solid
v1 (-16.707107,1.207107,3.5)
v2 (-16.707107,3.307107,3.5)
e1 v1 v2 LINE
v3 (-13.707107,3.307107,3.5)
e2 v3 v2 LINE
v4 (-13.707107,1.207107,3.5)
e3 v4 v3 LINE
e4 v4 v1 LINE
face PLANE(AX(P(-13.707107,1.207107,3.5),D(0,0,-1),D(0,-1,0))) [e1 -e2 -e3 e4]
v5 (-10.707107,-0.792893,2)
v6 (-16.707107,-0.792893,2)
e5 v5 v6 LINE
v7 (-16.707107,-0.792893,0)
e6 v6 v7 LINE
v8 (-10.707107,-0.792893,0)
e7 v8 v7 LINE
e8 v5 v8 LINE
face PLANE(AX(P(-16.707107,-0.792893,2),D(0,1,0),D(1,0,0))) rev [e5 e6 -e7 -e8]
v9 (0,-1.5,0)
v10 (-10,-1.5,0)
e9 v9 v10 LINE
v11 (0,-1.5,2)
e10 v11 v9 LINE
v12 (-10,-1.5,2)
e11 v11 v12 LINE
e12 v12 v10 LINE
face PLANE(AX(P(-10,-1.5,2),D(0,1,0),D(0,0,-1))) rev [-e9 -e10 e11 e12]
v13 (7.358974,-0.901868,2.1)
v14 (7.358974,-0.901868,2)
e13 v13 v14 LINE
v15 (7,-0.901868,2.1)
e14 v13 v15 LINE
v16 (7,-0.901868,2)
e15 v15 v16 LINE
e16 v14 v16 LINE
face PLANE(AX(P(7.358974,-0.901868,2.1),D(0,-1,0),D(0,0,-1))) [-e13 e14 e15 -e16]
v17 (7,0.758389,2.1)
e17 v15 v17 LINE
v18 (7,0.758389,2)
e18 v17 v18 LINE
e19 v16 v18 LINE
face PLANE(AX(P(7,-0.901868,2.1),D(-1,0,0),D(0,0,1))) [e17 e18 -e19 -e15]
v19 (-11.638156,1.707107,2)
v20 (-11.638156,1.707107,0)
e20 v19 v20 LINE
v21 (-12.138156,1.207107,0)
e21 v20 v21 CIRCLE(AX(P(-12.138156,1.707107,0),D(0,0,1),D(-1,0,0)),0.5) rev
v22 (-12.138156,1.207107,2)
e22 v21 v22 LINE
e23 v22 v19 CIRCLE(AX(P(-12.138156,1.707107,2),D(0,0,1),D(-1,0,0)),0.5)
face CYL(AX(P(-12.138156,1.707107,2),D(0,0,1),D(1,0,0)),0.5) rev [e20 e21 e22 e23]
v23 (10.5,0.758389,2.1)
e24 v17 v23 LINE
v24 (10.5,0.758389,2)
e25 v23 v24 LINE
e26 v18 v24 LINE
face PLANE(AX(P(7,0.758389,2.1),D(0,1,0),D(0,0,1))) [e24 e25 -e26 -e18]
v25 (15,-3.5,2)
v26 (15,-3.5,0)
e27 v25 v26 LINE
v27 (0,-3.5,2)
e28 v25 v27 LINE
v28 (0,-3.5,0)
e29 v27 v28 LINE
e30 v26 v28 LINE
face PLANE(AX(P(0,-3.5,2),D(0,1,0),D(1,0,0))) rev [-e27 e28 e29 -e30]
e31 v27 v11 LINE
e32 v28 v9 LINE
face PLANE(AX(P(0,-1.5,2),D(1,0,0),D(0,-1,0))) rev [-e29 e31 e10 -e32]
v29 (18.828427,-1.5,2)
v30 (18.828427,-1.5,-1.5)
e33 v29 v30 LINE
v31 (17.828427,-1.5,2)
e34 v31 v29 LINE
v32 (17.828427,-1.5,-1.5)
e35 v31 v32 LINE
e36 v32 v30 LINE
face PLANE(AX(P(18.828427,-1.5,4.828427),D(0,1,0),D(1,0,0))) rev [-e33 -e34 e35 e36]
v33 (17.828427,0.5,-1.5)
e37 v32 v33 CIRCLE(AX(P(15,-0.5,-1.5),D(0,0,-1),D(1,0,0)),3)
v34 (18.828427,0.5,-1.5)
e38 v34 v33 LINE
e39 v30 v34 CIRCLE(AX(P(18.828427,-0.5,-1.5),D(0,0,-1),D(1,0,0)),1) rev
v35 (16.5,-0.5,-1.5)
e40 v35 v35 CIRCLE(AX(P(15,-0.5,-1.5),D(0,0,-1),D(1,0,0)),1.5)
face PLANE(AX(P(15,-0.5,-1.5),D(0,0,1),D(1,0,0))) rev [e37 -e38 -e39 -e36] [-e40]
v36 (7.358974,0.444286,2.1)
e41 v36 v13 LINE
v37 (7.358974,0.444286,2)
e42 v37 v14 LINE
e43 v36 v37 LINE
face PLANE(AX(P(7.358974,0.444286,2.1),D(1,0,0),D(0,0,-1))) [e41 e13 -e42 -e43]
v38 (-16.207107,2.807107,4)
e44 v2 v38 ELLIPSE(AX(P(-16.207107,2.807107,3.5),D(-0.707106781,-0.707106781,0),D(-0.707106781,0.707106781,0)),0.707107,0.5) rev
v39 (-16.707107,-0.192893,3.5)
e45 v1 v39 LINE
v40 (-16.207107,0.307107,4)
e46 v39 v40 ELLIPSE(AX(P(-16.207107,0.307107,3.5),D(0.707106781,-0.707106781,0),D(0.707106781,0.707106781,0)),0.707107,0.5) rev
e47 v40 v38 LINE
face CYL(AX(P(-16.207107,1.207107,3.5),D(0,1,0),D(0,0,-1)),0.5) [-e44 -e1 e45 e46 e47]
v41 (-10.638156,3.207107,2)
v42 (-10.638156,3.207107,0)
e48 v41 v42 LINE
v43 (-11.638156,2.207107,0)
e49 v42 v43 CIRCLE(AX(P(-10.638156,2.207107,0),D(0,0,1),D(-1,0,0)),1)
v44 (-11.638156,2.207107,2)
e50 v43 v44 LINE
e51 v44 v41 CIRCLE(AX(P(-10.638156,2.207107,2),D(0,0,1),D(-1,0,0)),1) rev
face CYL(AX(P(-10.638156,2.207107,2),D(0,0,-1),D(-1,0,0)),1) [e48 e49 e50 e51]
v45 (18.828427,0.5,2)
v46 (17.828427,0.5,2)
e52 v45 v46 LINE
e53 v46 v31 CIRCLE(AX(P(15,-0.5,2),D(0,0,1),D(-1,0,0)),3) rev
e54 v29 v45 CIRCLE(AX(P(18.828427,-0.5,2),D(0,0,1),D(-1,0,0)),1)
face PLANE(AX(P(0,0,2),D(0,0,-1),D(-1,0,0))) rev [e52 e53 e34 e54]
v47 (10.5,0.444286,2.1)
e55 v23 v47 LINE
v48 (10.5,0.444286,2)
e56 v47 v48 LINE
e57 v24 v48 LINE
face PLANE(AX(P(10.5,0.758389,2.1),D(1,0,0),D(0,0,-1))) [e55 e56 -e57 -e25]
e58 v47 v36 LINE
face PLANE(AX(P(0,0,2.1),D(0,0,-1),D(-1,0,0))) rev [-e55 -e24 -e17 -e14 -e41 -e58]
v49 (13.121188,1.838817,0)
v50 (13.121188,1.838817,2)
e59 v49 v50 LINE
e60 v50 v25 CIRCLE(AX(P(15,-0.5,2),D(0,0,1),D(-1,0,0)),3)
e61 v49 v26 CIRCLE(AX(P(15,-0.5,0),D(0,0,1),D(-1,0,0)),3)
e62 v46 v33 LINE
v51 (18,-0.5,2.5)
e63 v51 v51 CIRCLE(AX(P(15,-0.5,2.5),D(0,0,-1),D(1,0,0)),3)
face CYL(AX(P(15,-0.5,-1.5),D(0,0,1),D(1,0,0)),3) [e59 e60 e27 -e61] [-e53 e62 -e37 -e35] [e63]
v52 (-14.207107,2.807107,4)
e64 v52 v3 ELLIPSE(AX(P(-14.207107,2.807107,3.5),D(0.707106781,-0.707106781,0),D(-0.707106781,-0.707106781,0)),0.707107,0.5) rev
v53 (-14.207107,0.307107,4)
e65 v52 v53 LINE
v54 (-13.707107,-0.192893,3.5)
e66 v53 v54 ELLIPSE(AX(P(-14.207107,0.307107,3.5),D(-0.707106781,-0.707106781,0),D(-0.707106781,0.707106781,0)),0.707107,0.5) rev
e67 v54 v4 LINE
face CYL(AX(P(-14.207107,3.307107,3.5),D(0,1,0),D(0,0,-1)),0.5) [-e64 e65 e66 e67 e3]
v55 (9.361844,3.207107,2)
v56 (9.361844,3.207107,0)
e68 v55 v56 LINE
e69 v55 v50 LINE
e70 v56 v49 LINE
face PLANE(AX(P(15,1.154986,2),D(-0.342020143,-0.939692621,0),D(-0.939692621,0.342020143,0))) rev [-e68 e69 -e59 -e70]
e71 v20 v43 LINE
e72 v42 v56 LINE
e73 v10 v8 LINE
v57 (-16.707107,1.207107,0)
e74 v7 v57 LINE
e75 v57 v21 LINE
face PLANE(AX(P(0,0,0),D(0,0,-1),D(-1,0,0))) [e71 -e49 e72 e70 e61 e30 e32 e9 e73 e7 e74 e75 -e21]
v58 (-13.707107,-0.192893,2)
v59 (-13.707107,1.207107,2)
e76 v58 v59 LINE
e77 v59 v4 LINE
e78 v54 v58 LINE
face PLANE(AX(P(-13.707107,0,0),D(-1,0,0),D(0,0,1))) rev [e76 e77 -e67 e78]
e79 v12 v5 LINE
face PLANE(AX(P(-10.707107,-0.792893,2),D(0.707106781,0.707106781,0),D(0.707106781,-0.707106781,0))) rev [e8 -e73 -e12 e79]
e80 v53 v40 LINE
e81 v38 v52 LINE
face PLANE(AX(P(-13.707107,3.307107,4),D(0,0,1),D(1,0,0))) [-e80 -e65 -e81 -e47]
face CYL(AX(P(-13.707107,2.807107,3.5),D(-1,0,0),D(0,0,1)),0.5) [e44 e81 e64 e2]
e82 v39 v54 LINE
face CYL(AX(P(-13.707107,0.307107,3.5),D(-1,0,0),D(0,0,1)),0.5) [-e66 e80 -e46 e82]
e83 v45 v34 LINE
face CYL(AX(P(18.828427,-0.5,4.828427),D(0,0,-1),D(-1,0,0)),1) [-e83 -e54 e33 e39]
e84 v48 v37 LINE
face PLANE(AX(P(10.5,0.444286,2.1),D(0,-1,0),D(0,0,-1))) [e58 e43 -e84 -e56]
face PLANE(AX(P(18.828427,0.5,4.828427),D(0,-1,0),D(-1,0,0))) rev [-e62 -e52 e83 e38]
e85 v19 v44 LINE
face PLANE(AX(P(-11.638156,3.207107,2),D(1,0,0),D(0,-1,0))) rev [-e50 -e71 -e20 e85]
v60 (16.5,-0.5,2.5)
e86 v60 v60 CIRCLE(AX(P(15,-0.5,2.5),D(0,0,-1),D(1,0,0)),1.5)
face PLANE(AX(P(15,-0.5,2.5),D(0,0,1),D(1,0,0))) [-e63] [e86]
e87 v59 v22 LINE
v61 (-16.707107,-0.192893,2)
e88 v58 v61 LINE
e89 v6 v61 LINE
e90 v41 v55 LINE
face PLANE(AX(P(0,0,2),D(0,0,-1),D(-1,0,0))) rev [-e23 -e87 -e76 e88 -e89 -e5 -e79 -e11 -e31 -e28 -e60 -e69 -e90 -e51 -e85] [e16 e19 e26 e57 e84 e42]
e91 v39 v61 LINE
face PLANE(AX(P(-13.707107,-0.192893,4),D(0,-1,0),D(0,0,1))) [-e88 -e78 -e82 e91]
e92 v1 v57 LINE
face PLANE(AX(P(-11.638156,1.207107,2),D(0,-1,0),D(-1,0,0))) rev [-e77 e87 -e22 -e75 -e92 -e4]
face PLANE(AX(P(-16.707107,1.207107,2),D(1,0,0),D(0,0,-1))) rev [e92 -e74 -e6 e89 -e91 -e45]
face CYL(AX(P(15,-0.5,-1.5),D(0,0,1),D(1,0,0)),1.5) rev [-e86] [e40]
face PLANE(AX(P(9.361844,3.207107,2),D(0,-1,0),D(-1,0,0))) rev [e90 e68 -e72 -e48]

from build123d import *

# Parameters (mm, degrees)
ESTRUSIONE_ESTRUSIONE1_DEPTH             = 2
RACCORDO1_R                              = 1
RACCORDO2_R                              = 0.5
ESTRUSIONE_ESTRUSIONE2_DEPTH             = 2.5
ESTRUSIONE_ESTRUSIONE2_DEPTH_BACK        = 1.5
SCHIZZO2_R                               = 3
ESTRUSIONE_ESTRUSIONE3_REACH             = 20.507
ESTRUSIONE_ESTRUSIONE3_DIRECTION_2_REACH = 20.507
ESTRUSIONE_ESTRUSIONE4_DEPTH             = 3
RACCORDO3_R                              = 0.5
SCHIZZO5_R                               = 1.5
TAGLIO_ESTRUSIONE1_DEPTH                 = 21.528432045
ESTRUSIONE_ESTRUSIONE5_DEPTH             = 0.1


with BuildPart() as part:
    # Schizzo1 → Estrusione-Estrusione1 (new body)
    with BuildSketch(Plane.XY):
        Polygon((-16.707106781, 0.792893219), (-10.707106781, 0.792893219), (-10, 1.5), (0, 1.5), (0, 3.5), (15, 3.5), (15, 0), (15, -1.154985921), (9.361844275, -3.207106781), (-11.638155725, -3.207106781), (-11.638155725, -1.207106781), (-16.707106781, -1.207106781), align=None)
    extrude(amount=ESTRUSIONE_ESTRUSIONE1_DEPTH)

    # Raccordo1
    raccordo1_edges = [part.edges().sort_by_distance(p)[0] for p in [
        (-11.638155725, -3.207106781, 1),
    ]]
    fillet(raccordo1_edges, radius=RACCORDO1_R)

    # Raccordo2
    raccordo2_edges = [part.edges().sort_by_distance(p)[0] for p in [
        (-11.638155725, -1.207106781, 1),
    ]]
    fillet(raccordo2_edges, radius=RACCORDO2_R)

    # Schizzo2 → Estrusione-Estrusione2 (add, two sides: drawn at the far end of the back side and taken through both)
    with BuildSketch(Plane.XY.offset(-ESTRUSIONE_ESTRUSIONE2_DEPTH_BACK)):
        with Locations((15, 0.5)):
            Circle(SCHIZZO2_R)
    extrude(amount=ESTRUSIONE_ESTRUSIONE2_DEPTH + ESTRUSIONE_ESTRUSIONE2_DEPTH_BACK)

    # Estrusione-Estrusione3: up to this face of the body (flat: up to its plane)
    estrusione_estrusione3_end = Plane(part.part.faces().sort_by_distance((0.378494116, -0.204899382, 2))[0])
    # Schizzo3 → Estrusione-Estrusione3 (add, up to the picked face)
    with BuildSketch(Plane.XY, mode=Mode.PRIVATE) as estrusione_estrusione3_sk1:
        with BuildLine():
            Line((18.828427125, 1.5), (17.828427125, 1.5))
            ThreePointArc((17.828427125, 1.5), (18, 0.5), (17.828427125, -0.5))
            Line((17.828427125, -0.5), (18.828427125, -0.5))
            ThreePointArc((18.828427125, -0.5), (19.828427125, 0.5), (18.828427125, 1.5))
        make_face()
    estrusione_estrusione3_tool1 = split(extrude(estrusione_estrusione3_sk1.sketch, amount=ESTRUSIONE_ESTRUSIONE3_REACH, mode=Mode.PRIVATE), bisect_by=estrusione_estrusione3_end, keep=Keep.BOTH, mode=Mode.PRIVATE)
    add(estrusione_estrusione3_tool1.solids().sort_by(Axis((18.792788, 0.5, 0), (0, 0, 1)))[0])

    # Estrusione-Estrusione3 direction 2: up to this face of the body (flat: up to its plane)
    estrusione_estrusione3_direction_2_end = Plane(part.part.faces().sort_by_distance((15, 0.5, -1.5))[0])
    # Schizzo3 → Estrusione-Estrusione3 direction 2 (add, up to the picked face)
    with BuildSketch(Plane.XY, mode=Mode.PRIVATE) as estrusione_estrusione3_direction_2_sk1:
        with BuildLine():
            Line((18.828427125, 1.5), (17.828427125, 1.5))
            ThreePointArc((17.828427125, 1.5), (18, 0.5), (17.828427125, -0.5))
            Line((17.828427125, -0.5), (18.828427125, -0.5))
            ThreePointArc((18.828427125, -0.5), (19.828427125, 0.5), (18.828427125, 1.5))
        make_face()
    estrusione_estrusione3_direction_2_tool1 = split(extrude(estrusione_estrusione3_direction_2_sk1.sketch, amount=-ESTRUSIONE_ESTRUSIONE3_DIRECTION_2_REACH, mode=Mode.PRIVATE), bisect_by=estrusione_estrusione3_direction_2_end, keep=Keep.BOTH, mode=Mode.PRIVATE)
    add(estrusione_estrusione3_direction_2_tool1.solids().sort_by(Axis((18.792788, 0.5, 0), (0, 0, -1)))[0])

    # Schizzo4 → Estrusione-Estrusione4 (add)
    with BuildSketch(Plane.ZY.offset(16.707106781)):
        Polygon((2, -1.207106781), (3.5, -1.207106781), (3.5, -3.307106781), (4, -3.307106781), (4, 0.192893219), (2, 0.192893219), align=None)
    extrude(amount=-ESTRUSIONE_ESTRUSIONE4_DEPTH)

    # Raccordo3
    raccordo3_edges = [part.edges().sort_by_distance(p)[0] for p in [
        (-15.207106781, 0.192893219, 4),
        (-13.707106781, -1.557106781, 4),
        (-15.207106781, -3.307106781, 4),
        (-16.707106781, -1.557106781, 4),
    ]]
    fillet(raccordo3_edges, radius=RACCORDO3_R - 0.0001)  # a hair under: the kernel refuses the full size

    # Schizzo5 → Taglio-Estrusione1 (cut, through all)
    with BuildSketch(Plane.XY.offset(2.5)):
        with Locations((15, 0.5)):
            Circle(SCHIZZO5_R)
    extrude(amount=-TAGLIO_ESTRUSIONE1_DEPTH, mode=Mode.SUBTRACT)


with BuildPart() as body_2:
    # Specchia2: mirrored copy
    add(part.part.mirror(Plane.ZX))

    # Schizzo6 → Estrusione-Estrusione5 (add)
    with BuildSketch(Plane.XY.offset(2)):
        Polygon((10.5, 0.758388832), (10.5, 0.444286268), (7.358974359, 0.444286268), (7.358974359, -0.901867578), (7, -0.901867578), (7, 0.758388832), align=None)
    extrude(amount=ESTRUSIONE_ESTRUSIONE5_DEPTH)


solid = body_2.part
